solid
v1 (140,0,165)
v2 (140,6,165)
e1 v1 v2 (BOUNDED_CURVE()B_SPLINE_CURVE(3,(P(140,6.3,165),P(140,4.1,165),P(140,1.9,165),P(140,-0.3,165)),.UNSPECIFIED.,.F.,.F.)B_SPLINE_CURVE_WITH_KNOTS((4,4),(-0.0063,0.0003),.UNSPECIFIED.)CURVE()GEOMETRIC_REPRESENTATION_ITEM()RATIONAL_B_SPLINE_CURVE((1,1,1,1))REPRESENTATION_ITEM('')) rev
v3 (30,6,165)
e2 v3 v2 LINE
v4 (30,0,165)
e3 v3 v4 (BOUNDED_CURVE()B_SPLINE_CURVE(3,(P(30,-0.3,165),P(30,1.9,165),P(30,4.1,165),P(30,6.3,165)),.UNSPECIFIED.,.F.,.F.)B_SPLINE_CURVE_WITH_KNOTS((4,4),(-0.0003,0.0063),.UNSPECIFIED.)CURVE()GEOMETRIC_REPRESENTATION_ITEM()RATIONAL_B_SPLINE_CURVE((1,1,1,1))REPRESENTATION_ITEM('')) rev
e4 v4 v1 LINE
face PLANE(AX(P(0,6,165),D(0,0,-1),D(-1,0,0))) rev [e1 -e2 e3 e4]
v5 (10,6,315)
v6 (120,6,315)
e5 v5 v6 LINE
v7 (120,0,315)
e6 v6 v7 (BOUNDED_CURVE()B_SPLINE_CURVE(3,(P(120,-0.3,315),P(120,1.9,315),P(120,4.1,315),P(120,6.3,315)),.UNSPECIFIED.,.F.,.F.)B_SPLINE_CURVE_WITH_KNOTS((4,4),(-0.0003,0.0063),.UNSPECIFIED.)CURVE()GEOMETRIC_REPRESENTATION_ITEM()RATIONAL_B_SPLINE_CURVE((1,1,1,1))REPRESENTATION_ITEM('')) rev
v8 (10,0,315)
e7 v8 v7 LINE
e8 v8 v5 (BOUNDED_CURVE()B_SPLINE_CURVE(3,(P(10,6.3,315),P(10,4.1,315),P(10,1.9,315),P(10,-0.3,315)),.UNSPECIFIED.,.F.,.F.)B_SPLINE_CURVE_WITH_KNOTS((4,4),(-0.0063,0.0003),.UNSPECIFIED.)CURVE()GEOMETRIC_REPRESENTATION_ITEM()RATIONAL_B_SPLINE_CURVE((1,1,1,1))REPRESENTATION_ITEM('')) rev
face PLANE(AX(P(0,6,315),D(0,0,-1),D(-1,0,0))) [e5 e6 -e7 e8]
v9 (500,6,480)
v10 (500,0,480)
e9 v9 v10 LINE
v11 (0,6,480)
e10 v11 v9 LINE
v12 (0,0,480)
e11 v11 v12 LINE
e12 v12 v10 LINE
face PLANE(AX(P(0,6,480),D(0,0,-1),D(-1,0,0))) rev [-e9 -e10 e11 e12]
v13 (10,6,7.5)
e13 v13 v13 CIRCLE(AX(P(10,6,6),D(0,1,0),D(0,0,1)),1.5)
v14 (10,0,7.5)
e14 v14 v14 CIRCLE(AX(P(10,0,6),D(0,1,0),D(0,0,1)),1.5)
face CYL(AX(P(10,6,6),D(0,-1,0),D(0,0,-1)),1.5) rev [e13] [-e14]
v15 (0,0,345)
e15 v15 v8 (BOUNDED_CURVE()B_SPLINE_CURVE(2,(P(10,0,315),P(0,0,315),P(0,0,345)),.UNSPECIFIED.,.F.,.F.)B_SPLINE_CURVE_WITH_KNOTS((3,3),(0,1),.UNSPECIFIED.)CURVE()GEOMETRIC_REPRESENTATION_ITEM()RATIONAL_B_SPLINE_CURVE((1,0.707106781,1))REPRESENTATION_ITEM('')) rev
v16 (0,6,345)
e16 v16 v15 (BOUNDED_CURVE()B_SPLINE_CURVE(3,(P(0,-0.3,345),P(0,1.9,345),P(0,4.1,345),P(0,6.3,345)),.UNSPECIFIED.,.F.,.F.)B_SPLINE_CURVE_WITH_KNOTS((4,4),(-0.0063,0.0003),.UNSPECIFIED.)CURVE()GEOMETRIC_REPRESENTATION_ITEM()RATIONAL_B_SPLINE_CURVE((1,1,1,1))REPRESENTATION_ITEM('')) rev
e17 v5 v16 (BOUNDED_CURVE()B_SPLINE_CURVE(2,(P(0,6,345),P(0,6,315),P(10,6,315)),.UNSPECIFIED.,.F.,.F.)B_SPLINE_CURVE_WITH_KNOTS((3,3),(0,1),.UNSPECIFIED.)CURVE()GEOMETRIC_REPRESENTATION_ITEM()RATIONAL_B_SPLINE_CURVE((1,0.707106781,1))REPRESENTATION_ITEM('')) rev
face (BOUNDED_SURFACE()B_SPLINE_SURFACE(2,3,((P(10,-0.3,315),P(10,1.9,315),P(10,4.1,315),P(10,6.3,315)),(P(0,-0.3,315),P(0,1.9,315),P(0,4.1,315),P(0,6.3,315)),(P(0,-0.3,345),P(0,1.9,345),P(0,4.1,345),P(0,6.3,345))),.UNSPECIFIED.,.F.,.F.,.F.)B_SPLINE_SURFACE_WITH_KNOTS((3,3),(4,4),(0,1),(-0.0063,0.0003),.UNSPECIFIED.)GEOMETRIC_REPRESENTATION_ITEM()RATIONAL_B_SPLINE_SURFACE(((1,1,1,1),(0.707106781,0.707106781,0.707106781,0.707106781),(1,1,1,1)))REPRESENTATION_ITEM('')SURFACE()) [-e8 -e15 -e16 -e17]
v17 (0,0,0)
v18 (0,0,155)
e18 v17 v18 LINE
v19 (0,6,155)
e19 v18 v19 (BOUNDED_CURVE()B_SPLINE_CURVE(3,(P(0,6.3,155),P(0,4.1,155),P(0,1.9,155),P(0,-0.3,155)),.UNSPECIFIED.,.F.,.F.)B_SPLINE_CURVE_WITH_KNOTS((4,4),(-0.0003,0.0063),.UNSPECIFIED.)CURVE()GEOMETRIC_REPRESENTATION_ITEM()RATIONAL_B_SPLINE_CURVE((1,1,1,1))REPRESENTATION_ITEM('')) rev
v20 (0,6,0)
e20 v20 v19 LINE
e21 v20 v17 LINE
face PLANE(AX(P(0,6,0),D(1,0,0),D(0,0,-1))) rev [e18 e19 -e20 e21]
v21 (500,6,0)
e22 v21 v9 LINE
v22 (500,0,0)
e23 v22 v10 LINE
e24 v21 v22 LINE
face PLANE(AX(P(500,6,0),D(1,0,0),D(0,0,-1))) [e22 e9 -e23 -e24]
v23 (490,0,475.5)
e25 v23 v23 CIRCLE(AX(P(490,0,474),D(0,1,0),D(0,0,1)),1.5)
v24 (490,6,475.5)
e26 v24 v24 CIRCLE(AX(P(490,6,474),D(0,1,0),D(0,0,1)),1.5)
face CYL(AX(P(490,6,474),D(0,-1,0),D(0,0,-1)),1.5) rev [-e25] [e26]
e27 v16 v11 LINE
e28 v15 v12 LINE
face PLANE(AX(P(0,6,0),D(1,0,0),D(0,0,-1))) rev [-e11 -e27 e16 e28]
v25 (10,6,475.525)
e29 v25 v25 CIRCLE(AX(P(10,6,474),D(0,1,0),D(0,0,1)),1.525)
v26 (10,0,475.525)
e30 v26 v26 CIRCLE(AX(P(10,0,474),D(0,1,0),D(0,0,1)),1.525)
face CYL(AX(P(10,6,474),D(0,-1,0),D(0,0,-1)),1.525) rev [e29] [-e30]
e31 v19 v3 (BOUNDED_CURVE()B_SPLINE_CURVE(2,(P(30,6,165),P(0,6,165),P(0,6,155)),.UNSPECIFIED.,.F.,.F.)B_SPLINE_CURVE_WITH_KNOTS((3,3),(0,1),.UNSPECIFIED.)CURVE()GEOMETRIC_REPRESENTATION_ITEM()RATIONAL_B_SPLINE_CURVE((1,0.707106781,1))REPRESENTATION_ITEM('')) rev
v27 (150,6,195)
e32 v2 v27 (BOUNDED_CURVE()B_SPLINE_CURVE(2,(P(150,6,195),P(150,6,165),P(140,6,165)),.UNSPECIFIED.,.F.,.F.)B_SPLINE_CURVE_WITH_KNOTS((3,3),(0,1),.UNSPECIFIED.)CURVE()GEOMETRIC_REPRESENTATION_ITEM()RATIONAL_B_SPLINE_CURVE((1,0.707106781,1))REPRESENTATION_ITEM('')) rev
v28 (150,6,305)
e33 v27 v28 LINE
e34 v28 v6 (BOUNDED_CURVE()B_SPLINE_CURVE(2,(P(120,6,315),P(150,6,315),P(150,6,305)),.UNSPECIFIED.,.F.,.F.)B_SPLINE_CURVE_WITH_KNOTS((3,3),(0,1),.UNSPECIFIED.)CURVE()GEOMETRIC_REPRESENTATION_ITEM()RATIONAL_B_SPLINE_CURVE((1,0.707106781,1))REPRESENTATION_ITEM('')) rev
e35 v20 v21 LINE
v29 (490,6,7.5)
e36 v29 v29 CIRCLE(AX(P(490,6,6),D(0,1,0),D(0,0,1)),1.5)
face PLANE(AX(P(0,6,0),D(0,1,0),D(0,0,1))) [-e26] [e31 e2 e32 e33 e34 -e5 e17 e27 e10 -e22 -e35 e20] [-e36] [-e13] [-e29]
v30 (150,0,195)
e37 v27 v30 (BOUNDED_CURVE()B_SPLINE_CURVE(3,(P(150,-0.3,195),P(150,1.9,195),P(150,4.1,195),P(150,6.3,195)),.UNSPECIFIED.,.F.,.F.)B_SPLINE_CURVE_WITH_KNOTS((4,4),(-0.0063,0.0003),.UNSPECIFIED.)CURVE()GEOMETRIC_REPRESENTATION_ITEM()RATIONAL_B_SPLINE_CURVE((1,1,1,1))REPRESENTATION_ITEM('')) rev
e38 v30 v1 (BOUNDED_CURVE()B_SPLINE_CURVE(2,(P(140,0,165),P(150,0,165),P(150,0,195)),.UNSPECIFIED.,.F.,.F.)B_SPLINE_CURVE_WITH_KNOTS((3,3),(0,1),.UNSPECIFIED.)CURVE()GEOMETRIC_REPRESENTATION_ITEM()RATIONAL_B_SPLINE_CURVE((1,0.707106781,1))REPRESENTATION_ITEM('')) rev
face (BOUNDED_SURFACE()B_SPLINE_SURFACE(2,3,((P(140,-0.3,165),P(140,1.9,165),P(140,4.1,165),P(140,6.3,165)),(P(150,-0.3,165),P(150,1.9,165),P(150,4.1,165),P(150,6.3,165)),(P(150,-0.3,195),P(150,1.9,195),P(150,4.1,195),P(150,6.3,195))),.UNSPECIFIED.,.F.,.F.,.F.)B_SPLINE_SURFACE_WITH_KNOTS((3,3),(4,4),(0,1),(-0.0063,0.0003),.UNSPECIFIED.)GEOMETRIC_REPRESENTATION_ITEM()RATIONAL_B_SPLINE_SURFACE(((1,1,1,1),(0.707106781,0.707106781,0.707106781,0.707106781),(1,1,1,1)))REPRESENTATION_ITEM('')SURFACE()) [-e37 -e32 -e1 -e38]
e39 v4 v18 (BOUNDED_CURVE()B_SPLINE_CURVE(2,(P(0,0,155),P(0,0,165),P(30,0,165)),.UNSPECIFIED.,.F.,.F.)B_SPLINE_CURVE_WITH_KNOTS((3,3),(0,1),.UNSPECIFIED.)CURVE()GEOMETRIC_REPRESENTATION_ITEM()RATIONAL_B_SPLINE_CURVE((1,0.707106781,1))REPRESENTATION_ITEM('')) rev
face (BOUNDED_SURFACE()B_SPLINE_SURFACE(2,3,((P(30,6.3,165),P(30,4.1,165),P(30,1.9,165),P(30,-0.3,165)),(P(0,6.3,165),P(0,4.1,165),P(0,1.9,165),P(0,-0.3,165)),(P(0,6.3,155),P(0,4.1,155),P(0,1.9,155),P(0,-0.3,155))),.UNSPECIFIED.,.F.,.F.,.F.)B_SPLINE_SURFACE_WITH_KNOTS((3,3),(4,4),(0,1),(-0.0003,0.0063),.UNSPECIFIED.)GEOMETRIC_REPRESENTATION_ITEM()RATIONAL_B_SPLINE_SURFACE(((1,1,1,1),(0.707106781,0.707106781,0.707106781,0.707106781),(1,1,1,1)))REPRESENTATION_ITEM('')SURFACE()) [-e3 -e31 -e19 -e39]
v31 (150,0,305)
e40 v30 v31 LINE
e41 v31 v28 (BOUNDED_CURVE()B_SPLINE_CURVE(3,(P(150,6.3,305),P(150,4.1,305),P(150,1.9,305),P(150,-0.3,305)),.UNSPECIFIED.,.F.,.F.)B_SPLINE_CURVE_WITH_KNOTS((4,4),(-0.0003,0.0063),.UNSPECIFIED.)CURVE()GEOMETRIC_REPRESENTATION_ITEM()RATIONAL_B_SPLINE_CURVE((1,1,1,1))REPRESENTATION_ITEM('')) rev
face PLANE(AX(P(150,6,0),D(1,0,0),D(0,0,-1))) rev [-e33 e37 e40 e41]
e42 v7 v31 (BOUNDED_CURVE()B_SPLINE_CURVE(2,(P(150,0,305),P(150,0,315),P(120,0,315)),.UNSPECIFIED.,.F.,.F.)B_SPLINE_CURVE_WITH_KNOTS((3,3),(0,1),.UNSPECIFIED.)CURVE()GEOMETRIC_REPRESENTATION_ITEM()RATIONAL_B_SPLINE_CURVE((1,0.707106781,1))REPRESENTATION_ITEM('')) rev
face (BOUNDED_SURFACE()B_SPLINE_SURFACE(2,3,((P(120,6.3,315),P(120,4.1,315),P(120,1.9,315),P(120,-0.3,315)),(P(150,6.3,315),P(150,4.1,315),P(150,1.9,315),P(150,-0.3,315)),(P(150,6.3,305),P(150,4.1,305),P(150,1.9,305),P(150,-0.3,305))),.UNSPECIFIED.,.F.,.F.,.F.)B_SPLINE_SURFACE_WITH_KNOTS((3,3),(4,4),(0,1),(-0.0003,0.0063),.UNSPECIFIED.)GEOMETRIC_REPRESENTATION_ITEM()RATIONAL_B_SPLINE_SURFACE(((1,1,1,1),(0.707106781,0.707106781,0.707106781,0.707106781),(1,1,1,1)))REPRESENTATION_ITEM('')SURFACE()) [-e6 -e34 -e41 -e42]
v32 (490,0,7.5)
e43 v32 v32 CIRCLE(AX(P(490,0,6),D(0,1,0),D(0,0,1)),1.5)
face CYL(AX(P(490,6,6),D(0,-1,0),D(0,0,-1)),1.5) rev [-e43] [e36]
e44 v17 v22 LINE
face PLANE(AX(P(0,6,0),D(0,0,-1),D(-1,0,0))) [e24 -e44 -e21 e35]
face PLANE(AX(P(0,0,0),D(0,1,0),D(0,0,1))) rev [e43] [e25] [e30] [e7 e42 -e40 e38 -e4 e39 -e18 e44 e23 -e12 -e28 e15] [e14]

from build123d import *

# Parameters (mm, degrees)
SKETCH1_R           = 1.525
SKETCH1_R_2         = 1.5
BOSS_EXTRUDE1_DEPTH = 6
FILLET1_SIZE        = 10
FILLET1_SIZE_2      = 30


with BuildPart() as part:
    # Sketch1 → Boss-Extrude1 (new body)
    with BuildSketch(Plane(origin=(0, 0, 0), x_dir=(1, 0, 0), z_dir=(0, 1, 0))):
        Polygon((500, 0), (0, 0), (0, -165), (150, -165), (150, -315), (0, -315), (0, -480), (500, -480), align=None)
        with Locations(Location((10, -474, 0), (0, 0, 270))):
            Circle(SKETCH1_R, mode=Mode.SUBTRACT)
        with Locations(Location((490, -474, 0), (0, 0, 270))):
            Circle(SKETCH1_R_2, mode=Mode.SUBTRACT)
        with Locations(Location((10, -6, 0), (0, 0, 270))):
            Circle(SKETCH1_R_2, mode=Mode.SUBTRACT)
        with Locations(Location((490, -6, 0), (0, 0, 270))):
            Circle(SKETCH1_R_2, mode=Mode.SUBTRACT)
    extrude(amount=BOSS_EXTRUDE1_DEPTH)

    # Fillet1
    # an asymmetric fillet: 30, 10 mm, written as the material it adds along each edge
    with BuildSketch(Plane(origin=(150, 0, 315), x_dir=(0, 0, -1), z_dir=(0, 1, 0)), Plane(origin=(150, 0, 165), x_dir=(-1, 0, 0), z_dir=(0, 1, 0))) as fillet1_piece_1:
        with BuildLine():
            Bezier((FILLET1_SIZE, 0), (0, 0), (0, FILLET1_SIZE_2), weights=[1, 0.707106781, 1])
            Line((0, FILLET1_SIZE_2), (0, 0))
            Line((0, 0), (FILLET1_SIZE, 0))
        make_face()
    extrude(amount=6)
    # an asymmetric fillet: 30, 10 mm, written as the material it takes off along each edge
    with BuildSketch(Plane(origin=(0, -75, 165), x_dir=(0, 0, -1), z_dir=(0, 1, 0)), Plane(origin=(0, -75, 315), x_dir=(1, 0, 0), z_dir=(0, 1, 0))) as fillet1_2_piece_1:
        with BuildLine():
            Bezier((FILLET1_SIZE, 0), (0, 0), (0, -FILLET1_SIZE_2), weights=[1, 0.707106781, 1])
            Line((0, -FILLET1_SIZE_2), (0, 0))
            Line((0, 0), (FILLET1_SIZE, 0))
        make_face()
    extrude(amount=156, mode=Mode.SUBTRACT)


solid = part.part
